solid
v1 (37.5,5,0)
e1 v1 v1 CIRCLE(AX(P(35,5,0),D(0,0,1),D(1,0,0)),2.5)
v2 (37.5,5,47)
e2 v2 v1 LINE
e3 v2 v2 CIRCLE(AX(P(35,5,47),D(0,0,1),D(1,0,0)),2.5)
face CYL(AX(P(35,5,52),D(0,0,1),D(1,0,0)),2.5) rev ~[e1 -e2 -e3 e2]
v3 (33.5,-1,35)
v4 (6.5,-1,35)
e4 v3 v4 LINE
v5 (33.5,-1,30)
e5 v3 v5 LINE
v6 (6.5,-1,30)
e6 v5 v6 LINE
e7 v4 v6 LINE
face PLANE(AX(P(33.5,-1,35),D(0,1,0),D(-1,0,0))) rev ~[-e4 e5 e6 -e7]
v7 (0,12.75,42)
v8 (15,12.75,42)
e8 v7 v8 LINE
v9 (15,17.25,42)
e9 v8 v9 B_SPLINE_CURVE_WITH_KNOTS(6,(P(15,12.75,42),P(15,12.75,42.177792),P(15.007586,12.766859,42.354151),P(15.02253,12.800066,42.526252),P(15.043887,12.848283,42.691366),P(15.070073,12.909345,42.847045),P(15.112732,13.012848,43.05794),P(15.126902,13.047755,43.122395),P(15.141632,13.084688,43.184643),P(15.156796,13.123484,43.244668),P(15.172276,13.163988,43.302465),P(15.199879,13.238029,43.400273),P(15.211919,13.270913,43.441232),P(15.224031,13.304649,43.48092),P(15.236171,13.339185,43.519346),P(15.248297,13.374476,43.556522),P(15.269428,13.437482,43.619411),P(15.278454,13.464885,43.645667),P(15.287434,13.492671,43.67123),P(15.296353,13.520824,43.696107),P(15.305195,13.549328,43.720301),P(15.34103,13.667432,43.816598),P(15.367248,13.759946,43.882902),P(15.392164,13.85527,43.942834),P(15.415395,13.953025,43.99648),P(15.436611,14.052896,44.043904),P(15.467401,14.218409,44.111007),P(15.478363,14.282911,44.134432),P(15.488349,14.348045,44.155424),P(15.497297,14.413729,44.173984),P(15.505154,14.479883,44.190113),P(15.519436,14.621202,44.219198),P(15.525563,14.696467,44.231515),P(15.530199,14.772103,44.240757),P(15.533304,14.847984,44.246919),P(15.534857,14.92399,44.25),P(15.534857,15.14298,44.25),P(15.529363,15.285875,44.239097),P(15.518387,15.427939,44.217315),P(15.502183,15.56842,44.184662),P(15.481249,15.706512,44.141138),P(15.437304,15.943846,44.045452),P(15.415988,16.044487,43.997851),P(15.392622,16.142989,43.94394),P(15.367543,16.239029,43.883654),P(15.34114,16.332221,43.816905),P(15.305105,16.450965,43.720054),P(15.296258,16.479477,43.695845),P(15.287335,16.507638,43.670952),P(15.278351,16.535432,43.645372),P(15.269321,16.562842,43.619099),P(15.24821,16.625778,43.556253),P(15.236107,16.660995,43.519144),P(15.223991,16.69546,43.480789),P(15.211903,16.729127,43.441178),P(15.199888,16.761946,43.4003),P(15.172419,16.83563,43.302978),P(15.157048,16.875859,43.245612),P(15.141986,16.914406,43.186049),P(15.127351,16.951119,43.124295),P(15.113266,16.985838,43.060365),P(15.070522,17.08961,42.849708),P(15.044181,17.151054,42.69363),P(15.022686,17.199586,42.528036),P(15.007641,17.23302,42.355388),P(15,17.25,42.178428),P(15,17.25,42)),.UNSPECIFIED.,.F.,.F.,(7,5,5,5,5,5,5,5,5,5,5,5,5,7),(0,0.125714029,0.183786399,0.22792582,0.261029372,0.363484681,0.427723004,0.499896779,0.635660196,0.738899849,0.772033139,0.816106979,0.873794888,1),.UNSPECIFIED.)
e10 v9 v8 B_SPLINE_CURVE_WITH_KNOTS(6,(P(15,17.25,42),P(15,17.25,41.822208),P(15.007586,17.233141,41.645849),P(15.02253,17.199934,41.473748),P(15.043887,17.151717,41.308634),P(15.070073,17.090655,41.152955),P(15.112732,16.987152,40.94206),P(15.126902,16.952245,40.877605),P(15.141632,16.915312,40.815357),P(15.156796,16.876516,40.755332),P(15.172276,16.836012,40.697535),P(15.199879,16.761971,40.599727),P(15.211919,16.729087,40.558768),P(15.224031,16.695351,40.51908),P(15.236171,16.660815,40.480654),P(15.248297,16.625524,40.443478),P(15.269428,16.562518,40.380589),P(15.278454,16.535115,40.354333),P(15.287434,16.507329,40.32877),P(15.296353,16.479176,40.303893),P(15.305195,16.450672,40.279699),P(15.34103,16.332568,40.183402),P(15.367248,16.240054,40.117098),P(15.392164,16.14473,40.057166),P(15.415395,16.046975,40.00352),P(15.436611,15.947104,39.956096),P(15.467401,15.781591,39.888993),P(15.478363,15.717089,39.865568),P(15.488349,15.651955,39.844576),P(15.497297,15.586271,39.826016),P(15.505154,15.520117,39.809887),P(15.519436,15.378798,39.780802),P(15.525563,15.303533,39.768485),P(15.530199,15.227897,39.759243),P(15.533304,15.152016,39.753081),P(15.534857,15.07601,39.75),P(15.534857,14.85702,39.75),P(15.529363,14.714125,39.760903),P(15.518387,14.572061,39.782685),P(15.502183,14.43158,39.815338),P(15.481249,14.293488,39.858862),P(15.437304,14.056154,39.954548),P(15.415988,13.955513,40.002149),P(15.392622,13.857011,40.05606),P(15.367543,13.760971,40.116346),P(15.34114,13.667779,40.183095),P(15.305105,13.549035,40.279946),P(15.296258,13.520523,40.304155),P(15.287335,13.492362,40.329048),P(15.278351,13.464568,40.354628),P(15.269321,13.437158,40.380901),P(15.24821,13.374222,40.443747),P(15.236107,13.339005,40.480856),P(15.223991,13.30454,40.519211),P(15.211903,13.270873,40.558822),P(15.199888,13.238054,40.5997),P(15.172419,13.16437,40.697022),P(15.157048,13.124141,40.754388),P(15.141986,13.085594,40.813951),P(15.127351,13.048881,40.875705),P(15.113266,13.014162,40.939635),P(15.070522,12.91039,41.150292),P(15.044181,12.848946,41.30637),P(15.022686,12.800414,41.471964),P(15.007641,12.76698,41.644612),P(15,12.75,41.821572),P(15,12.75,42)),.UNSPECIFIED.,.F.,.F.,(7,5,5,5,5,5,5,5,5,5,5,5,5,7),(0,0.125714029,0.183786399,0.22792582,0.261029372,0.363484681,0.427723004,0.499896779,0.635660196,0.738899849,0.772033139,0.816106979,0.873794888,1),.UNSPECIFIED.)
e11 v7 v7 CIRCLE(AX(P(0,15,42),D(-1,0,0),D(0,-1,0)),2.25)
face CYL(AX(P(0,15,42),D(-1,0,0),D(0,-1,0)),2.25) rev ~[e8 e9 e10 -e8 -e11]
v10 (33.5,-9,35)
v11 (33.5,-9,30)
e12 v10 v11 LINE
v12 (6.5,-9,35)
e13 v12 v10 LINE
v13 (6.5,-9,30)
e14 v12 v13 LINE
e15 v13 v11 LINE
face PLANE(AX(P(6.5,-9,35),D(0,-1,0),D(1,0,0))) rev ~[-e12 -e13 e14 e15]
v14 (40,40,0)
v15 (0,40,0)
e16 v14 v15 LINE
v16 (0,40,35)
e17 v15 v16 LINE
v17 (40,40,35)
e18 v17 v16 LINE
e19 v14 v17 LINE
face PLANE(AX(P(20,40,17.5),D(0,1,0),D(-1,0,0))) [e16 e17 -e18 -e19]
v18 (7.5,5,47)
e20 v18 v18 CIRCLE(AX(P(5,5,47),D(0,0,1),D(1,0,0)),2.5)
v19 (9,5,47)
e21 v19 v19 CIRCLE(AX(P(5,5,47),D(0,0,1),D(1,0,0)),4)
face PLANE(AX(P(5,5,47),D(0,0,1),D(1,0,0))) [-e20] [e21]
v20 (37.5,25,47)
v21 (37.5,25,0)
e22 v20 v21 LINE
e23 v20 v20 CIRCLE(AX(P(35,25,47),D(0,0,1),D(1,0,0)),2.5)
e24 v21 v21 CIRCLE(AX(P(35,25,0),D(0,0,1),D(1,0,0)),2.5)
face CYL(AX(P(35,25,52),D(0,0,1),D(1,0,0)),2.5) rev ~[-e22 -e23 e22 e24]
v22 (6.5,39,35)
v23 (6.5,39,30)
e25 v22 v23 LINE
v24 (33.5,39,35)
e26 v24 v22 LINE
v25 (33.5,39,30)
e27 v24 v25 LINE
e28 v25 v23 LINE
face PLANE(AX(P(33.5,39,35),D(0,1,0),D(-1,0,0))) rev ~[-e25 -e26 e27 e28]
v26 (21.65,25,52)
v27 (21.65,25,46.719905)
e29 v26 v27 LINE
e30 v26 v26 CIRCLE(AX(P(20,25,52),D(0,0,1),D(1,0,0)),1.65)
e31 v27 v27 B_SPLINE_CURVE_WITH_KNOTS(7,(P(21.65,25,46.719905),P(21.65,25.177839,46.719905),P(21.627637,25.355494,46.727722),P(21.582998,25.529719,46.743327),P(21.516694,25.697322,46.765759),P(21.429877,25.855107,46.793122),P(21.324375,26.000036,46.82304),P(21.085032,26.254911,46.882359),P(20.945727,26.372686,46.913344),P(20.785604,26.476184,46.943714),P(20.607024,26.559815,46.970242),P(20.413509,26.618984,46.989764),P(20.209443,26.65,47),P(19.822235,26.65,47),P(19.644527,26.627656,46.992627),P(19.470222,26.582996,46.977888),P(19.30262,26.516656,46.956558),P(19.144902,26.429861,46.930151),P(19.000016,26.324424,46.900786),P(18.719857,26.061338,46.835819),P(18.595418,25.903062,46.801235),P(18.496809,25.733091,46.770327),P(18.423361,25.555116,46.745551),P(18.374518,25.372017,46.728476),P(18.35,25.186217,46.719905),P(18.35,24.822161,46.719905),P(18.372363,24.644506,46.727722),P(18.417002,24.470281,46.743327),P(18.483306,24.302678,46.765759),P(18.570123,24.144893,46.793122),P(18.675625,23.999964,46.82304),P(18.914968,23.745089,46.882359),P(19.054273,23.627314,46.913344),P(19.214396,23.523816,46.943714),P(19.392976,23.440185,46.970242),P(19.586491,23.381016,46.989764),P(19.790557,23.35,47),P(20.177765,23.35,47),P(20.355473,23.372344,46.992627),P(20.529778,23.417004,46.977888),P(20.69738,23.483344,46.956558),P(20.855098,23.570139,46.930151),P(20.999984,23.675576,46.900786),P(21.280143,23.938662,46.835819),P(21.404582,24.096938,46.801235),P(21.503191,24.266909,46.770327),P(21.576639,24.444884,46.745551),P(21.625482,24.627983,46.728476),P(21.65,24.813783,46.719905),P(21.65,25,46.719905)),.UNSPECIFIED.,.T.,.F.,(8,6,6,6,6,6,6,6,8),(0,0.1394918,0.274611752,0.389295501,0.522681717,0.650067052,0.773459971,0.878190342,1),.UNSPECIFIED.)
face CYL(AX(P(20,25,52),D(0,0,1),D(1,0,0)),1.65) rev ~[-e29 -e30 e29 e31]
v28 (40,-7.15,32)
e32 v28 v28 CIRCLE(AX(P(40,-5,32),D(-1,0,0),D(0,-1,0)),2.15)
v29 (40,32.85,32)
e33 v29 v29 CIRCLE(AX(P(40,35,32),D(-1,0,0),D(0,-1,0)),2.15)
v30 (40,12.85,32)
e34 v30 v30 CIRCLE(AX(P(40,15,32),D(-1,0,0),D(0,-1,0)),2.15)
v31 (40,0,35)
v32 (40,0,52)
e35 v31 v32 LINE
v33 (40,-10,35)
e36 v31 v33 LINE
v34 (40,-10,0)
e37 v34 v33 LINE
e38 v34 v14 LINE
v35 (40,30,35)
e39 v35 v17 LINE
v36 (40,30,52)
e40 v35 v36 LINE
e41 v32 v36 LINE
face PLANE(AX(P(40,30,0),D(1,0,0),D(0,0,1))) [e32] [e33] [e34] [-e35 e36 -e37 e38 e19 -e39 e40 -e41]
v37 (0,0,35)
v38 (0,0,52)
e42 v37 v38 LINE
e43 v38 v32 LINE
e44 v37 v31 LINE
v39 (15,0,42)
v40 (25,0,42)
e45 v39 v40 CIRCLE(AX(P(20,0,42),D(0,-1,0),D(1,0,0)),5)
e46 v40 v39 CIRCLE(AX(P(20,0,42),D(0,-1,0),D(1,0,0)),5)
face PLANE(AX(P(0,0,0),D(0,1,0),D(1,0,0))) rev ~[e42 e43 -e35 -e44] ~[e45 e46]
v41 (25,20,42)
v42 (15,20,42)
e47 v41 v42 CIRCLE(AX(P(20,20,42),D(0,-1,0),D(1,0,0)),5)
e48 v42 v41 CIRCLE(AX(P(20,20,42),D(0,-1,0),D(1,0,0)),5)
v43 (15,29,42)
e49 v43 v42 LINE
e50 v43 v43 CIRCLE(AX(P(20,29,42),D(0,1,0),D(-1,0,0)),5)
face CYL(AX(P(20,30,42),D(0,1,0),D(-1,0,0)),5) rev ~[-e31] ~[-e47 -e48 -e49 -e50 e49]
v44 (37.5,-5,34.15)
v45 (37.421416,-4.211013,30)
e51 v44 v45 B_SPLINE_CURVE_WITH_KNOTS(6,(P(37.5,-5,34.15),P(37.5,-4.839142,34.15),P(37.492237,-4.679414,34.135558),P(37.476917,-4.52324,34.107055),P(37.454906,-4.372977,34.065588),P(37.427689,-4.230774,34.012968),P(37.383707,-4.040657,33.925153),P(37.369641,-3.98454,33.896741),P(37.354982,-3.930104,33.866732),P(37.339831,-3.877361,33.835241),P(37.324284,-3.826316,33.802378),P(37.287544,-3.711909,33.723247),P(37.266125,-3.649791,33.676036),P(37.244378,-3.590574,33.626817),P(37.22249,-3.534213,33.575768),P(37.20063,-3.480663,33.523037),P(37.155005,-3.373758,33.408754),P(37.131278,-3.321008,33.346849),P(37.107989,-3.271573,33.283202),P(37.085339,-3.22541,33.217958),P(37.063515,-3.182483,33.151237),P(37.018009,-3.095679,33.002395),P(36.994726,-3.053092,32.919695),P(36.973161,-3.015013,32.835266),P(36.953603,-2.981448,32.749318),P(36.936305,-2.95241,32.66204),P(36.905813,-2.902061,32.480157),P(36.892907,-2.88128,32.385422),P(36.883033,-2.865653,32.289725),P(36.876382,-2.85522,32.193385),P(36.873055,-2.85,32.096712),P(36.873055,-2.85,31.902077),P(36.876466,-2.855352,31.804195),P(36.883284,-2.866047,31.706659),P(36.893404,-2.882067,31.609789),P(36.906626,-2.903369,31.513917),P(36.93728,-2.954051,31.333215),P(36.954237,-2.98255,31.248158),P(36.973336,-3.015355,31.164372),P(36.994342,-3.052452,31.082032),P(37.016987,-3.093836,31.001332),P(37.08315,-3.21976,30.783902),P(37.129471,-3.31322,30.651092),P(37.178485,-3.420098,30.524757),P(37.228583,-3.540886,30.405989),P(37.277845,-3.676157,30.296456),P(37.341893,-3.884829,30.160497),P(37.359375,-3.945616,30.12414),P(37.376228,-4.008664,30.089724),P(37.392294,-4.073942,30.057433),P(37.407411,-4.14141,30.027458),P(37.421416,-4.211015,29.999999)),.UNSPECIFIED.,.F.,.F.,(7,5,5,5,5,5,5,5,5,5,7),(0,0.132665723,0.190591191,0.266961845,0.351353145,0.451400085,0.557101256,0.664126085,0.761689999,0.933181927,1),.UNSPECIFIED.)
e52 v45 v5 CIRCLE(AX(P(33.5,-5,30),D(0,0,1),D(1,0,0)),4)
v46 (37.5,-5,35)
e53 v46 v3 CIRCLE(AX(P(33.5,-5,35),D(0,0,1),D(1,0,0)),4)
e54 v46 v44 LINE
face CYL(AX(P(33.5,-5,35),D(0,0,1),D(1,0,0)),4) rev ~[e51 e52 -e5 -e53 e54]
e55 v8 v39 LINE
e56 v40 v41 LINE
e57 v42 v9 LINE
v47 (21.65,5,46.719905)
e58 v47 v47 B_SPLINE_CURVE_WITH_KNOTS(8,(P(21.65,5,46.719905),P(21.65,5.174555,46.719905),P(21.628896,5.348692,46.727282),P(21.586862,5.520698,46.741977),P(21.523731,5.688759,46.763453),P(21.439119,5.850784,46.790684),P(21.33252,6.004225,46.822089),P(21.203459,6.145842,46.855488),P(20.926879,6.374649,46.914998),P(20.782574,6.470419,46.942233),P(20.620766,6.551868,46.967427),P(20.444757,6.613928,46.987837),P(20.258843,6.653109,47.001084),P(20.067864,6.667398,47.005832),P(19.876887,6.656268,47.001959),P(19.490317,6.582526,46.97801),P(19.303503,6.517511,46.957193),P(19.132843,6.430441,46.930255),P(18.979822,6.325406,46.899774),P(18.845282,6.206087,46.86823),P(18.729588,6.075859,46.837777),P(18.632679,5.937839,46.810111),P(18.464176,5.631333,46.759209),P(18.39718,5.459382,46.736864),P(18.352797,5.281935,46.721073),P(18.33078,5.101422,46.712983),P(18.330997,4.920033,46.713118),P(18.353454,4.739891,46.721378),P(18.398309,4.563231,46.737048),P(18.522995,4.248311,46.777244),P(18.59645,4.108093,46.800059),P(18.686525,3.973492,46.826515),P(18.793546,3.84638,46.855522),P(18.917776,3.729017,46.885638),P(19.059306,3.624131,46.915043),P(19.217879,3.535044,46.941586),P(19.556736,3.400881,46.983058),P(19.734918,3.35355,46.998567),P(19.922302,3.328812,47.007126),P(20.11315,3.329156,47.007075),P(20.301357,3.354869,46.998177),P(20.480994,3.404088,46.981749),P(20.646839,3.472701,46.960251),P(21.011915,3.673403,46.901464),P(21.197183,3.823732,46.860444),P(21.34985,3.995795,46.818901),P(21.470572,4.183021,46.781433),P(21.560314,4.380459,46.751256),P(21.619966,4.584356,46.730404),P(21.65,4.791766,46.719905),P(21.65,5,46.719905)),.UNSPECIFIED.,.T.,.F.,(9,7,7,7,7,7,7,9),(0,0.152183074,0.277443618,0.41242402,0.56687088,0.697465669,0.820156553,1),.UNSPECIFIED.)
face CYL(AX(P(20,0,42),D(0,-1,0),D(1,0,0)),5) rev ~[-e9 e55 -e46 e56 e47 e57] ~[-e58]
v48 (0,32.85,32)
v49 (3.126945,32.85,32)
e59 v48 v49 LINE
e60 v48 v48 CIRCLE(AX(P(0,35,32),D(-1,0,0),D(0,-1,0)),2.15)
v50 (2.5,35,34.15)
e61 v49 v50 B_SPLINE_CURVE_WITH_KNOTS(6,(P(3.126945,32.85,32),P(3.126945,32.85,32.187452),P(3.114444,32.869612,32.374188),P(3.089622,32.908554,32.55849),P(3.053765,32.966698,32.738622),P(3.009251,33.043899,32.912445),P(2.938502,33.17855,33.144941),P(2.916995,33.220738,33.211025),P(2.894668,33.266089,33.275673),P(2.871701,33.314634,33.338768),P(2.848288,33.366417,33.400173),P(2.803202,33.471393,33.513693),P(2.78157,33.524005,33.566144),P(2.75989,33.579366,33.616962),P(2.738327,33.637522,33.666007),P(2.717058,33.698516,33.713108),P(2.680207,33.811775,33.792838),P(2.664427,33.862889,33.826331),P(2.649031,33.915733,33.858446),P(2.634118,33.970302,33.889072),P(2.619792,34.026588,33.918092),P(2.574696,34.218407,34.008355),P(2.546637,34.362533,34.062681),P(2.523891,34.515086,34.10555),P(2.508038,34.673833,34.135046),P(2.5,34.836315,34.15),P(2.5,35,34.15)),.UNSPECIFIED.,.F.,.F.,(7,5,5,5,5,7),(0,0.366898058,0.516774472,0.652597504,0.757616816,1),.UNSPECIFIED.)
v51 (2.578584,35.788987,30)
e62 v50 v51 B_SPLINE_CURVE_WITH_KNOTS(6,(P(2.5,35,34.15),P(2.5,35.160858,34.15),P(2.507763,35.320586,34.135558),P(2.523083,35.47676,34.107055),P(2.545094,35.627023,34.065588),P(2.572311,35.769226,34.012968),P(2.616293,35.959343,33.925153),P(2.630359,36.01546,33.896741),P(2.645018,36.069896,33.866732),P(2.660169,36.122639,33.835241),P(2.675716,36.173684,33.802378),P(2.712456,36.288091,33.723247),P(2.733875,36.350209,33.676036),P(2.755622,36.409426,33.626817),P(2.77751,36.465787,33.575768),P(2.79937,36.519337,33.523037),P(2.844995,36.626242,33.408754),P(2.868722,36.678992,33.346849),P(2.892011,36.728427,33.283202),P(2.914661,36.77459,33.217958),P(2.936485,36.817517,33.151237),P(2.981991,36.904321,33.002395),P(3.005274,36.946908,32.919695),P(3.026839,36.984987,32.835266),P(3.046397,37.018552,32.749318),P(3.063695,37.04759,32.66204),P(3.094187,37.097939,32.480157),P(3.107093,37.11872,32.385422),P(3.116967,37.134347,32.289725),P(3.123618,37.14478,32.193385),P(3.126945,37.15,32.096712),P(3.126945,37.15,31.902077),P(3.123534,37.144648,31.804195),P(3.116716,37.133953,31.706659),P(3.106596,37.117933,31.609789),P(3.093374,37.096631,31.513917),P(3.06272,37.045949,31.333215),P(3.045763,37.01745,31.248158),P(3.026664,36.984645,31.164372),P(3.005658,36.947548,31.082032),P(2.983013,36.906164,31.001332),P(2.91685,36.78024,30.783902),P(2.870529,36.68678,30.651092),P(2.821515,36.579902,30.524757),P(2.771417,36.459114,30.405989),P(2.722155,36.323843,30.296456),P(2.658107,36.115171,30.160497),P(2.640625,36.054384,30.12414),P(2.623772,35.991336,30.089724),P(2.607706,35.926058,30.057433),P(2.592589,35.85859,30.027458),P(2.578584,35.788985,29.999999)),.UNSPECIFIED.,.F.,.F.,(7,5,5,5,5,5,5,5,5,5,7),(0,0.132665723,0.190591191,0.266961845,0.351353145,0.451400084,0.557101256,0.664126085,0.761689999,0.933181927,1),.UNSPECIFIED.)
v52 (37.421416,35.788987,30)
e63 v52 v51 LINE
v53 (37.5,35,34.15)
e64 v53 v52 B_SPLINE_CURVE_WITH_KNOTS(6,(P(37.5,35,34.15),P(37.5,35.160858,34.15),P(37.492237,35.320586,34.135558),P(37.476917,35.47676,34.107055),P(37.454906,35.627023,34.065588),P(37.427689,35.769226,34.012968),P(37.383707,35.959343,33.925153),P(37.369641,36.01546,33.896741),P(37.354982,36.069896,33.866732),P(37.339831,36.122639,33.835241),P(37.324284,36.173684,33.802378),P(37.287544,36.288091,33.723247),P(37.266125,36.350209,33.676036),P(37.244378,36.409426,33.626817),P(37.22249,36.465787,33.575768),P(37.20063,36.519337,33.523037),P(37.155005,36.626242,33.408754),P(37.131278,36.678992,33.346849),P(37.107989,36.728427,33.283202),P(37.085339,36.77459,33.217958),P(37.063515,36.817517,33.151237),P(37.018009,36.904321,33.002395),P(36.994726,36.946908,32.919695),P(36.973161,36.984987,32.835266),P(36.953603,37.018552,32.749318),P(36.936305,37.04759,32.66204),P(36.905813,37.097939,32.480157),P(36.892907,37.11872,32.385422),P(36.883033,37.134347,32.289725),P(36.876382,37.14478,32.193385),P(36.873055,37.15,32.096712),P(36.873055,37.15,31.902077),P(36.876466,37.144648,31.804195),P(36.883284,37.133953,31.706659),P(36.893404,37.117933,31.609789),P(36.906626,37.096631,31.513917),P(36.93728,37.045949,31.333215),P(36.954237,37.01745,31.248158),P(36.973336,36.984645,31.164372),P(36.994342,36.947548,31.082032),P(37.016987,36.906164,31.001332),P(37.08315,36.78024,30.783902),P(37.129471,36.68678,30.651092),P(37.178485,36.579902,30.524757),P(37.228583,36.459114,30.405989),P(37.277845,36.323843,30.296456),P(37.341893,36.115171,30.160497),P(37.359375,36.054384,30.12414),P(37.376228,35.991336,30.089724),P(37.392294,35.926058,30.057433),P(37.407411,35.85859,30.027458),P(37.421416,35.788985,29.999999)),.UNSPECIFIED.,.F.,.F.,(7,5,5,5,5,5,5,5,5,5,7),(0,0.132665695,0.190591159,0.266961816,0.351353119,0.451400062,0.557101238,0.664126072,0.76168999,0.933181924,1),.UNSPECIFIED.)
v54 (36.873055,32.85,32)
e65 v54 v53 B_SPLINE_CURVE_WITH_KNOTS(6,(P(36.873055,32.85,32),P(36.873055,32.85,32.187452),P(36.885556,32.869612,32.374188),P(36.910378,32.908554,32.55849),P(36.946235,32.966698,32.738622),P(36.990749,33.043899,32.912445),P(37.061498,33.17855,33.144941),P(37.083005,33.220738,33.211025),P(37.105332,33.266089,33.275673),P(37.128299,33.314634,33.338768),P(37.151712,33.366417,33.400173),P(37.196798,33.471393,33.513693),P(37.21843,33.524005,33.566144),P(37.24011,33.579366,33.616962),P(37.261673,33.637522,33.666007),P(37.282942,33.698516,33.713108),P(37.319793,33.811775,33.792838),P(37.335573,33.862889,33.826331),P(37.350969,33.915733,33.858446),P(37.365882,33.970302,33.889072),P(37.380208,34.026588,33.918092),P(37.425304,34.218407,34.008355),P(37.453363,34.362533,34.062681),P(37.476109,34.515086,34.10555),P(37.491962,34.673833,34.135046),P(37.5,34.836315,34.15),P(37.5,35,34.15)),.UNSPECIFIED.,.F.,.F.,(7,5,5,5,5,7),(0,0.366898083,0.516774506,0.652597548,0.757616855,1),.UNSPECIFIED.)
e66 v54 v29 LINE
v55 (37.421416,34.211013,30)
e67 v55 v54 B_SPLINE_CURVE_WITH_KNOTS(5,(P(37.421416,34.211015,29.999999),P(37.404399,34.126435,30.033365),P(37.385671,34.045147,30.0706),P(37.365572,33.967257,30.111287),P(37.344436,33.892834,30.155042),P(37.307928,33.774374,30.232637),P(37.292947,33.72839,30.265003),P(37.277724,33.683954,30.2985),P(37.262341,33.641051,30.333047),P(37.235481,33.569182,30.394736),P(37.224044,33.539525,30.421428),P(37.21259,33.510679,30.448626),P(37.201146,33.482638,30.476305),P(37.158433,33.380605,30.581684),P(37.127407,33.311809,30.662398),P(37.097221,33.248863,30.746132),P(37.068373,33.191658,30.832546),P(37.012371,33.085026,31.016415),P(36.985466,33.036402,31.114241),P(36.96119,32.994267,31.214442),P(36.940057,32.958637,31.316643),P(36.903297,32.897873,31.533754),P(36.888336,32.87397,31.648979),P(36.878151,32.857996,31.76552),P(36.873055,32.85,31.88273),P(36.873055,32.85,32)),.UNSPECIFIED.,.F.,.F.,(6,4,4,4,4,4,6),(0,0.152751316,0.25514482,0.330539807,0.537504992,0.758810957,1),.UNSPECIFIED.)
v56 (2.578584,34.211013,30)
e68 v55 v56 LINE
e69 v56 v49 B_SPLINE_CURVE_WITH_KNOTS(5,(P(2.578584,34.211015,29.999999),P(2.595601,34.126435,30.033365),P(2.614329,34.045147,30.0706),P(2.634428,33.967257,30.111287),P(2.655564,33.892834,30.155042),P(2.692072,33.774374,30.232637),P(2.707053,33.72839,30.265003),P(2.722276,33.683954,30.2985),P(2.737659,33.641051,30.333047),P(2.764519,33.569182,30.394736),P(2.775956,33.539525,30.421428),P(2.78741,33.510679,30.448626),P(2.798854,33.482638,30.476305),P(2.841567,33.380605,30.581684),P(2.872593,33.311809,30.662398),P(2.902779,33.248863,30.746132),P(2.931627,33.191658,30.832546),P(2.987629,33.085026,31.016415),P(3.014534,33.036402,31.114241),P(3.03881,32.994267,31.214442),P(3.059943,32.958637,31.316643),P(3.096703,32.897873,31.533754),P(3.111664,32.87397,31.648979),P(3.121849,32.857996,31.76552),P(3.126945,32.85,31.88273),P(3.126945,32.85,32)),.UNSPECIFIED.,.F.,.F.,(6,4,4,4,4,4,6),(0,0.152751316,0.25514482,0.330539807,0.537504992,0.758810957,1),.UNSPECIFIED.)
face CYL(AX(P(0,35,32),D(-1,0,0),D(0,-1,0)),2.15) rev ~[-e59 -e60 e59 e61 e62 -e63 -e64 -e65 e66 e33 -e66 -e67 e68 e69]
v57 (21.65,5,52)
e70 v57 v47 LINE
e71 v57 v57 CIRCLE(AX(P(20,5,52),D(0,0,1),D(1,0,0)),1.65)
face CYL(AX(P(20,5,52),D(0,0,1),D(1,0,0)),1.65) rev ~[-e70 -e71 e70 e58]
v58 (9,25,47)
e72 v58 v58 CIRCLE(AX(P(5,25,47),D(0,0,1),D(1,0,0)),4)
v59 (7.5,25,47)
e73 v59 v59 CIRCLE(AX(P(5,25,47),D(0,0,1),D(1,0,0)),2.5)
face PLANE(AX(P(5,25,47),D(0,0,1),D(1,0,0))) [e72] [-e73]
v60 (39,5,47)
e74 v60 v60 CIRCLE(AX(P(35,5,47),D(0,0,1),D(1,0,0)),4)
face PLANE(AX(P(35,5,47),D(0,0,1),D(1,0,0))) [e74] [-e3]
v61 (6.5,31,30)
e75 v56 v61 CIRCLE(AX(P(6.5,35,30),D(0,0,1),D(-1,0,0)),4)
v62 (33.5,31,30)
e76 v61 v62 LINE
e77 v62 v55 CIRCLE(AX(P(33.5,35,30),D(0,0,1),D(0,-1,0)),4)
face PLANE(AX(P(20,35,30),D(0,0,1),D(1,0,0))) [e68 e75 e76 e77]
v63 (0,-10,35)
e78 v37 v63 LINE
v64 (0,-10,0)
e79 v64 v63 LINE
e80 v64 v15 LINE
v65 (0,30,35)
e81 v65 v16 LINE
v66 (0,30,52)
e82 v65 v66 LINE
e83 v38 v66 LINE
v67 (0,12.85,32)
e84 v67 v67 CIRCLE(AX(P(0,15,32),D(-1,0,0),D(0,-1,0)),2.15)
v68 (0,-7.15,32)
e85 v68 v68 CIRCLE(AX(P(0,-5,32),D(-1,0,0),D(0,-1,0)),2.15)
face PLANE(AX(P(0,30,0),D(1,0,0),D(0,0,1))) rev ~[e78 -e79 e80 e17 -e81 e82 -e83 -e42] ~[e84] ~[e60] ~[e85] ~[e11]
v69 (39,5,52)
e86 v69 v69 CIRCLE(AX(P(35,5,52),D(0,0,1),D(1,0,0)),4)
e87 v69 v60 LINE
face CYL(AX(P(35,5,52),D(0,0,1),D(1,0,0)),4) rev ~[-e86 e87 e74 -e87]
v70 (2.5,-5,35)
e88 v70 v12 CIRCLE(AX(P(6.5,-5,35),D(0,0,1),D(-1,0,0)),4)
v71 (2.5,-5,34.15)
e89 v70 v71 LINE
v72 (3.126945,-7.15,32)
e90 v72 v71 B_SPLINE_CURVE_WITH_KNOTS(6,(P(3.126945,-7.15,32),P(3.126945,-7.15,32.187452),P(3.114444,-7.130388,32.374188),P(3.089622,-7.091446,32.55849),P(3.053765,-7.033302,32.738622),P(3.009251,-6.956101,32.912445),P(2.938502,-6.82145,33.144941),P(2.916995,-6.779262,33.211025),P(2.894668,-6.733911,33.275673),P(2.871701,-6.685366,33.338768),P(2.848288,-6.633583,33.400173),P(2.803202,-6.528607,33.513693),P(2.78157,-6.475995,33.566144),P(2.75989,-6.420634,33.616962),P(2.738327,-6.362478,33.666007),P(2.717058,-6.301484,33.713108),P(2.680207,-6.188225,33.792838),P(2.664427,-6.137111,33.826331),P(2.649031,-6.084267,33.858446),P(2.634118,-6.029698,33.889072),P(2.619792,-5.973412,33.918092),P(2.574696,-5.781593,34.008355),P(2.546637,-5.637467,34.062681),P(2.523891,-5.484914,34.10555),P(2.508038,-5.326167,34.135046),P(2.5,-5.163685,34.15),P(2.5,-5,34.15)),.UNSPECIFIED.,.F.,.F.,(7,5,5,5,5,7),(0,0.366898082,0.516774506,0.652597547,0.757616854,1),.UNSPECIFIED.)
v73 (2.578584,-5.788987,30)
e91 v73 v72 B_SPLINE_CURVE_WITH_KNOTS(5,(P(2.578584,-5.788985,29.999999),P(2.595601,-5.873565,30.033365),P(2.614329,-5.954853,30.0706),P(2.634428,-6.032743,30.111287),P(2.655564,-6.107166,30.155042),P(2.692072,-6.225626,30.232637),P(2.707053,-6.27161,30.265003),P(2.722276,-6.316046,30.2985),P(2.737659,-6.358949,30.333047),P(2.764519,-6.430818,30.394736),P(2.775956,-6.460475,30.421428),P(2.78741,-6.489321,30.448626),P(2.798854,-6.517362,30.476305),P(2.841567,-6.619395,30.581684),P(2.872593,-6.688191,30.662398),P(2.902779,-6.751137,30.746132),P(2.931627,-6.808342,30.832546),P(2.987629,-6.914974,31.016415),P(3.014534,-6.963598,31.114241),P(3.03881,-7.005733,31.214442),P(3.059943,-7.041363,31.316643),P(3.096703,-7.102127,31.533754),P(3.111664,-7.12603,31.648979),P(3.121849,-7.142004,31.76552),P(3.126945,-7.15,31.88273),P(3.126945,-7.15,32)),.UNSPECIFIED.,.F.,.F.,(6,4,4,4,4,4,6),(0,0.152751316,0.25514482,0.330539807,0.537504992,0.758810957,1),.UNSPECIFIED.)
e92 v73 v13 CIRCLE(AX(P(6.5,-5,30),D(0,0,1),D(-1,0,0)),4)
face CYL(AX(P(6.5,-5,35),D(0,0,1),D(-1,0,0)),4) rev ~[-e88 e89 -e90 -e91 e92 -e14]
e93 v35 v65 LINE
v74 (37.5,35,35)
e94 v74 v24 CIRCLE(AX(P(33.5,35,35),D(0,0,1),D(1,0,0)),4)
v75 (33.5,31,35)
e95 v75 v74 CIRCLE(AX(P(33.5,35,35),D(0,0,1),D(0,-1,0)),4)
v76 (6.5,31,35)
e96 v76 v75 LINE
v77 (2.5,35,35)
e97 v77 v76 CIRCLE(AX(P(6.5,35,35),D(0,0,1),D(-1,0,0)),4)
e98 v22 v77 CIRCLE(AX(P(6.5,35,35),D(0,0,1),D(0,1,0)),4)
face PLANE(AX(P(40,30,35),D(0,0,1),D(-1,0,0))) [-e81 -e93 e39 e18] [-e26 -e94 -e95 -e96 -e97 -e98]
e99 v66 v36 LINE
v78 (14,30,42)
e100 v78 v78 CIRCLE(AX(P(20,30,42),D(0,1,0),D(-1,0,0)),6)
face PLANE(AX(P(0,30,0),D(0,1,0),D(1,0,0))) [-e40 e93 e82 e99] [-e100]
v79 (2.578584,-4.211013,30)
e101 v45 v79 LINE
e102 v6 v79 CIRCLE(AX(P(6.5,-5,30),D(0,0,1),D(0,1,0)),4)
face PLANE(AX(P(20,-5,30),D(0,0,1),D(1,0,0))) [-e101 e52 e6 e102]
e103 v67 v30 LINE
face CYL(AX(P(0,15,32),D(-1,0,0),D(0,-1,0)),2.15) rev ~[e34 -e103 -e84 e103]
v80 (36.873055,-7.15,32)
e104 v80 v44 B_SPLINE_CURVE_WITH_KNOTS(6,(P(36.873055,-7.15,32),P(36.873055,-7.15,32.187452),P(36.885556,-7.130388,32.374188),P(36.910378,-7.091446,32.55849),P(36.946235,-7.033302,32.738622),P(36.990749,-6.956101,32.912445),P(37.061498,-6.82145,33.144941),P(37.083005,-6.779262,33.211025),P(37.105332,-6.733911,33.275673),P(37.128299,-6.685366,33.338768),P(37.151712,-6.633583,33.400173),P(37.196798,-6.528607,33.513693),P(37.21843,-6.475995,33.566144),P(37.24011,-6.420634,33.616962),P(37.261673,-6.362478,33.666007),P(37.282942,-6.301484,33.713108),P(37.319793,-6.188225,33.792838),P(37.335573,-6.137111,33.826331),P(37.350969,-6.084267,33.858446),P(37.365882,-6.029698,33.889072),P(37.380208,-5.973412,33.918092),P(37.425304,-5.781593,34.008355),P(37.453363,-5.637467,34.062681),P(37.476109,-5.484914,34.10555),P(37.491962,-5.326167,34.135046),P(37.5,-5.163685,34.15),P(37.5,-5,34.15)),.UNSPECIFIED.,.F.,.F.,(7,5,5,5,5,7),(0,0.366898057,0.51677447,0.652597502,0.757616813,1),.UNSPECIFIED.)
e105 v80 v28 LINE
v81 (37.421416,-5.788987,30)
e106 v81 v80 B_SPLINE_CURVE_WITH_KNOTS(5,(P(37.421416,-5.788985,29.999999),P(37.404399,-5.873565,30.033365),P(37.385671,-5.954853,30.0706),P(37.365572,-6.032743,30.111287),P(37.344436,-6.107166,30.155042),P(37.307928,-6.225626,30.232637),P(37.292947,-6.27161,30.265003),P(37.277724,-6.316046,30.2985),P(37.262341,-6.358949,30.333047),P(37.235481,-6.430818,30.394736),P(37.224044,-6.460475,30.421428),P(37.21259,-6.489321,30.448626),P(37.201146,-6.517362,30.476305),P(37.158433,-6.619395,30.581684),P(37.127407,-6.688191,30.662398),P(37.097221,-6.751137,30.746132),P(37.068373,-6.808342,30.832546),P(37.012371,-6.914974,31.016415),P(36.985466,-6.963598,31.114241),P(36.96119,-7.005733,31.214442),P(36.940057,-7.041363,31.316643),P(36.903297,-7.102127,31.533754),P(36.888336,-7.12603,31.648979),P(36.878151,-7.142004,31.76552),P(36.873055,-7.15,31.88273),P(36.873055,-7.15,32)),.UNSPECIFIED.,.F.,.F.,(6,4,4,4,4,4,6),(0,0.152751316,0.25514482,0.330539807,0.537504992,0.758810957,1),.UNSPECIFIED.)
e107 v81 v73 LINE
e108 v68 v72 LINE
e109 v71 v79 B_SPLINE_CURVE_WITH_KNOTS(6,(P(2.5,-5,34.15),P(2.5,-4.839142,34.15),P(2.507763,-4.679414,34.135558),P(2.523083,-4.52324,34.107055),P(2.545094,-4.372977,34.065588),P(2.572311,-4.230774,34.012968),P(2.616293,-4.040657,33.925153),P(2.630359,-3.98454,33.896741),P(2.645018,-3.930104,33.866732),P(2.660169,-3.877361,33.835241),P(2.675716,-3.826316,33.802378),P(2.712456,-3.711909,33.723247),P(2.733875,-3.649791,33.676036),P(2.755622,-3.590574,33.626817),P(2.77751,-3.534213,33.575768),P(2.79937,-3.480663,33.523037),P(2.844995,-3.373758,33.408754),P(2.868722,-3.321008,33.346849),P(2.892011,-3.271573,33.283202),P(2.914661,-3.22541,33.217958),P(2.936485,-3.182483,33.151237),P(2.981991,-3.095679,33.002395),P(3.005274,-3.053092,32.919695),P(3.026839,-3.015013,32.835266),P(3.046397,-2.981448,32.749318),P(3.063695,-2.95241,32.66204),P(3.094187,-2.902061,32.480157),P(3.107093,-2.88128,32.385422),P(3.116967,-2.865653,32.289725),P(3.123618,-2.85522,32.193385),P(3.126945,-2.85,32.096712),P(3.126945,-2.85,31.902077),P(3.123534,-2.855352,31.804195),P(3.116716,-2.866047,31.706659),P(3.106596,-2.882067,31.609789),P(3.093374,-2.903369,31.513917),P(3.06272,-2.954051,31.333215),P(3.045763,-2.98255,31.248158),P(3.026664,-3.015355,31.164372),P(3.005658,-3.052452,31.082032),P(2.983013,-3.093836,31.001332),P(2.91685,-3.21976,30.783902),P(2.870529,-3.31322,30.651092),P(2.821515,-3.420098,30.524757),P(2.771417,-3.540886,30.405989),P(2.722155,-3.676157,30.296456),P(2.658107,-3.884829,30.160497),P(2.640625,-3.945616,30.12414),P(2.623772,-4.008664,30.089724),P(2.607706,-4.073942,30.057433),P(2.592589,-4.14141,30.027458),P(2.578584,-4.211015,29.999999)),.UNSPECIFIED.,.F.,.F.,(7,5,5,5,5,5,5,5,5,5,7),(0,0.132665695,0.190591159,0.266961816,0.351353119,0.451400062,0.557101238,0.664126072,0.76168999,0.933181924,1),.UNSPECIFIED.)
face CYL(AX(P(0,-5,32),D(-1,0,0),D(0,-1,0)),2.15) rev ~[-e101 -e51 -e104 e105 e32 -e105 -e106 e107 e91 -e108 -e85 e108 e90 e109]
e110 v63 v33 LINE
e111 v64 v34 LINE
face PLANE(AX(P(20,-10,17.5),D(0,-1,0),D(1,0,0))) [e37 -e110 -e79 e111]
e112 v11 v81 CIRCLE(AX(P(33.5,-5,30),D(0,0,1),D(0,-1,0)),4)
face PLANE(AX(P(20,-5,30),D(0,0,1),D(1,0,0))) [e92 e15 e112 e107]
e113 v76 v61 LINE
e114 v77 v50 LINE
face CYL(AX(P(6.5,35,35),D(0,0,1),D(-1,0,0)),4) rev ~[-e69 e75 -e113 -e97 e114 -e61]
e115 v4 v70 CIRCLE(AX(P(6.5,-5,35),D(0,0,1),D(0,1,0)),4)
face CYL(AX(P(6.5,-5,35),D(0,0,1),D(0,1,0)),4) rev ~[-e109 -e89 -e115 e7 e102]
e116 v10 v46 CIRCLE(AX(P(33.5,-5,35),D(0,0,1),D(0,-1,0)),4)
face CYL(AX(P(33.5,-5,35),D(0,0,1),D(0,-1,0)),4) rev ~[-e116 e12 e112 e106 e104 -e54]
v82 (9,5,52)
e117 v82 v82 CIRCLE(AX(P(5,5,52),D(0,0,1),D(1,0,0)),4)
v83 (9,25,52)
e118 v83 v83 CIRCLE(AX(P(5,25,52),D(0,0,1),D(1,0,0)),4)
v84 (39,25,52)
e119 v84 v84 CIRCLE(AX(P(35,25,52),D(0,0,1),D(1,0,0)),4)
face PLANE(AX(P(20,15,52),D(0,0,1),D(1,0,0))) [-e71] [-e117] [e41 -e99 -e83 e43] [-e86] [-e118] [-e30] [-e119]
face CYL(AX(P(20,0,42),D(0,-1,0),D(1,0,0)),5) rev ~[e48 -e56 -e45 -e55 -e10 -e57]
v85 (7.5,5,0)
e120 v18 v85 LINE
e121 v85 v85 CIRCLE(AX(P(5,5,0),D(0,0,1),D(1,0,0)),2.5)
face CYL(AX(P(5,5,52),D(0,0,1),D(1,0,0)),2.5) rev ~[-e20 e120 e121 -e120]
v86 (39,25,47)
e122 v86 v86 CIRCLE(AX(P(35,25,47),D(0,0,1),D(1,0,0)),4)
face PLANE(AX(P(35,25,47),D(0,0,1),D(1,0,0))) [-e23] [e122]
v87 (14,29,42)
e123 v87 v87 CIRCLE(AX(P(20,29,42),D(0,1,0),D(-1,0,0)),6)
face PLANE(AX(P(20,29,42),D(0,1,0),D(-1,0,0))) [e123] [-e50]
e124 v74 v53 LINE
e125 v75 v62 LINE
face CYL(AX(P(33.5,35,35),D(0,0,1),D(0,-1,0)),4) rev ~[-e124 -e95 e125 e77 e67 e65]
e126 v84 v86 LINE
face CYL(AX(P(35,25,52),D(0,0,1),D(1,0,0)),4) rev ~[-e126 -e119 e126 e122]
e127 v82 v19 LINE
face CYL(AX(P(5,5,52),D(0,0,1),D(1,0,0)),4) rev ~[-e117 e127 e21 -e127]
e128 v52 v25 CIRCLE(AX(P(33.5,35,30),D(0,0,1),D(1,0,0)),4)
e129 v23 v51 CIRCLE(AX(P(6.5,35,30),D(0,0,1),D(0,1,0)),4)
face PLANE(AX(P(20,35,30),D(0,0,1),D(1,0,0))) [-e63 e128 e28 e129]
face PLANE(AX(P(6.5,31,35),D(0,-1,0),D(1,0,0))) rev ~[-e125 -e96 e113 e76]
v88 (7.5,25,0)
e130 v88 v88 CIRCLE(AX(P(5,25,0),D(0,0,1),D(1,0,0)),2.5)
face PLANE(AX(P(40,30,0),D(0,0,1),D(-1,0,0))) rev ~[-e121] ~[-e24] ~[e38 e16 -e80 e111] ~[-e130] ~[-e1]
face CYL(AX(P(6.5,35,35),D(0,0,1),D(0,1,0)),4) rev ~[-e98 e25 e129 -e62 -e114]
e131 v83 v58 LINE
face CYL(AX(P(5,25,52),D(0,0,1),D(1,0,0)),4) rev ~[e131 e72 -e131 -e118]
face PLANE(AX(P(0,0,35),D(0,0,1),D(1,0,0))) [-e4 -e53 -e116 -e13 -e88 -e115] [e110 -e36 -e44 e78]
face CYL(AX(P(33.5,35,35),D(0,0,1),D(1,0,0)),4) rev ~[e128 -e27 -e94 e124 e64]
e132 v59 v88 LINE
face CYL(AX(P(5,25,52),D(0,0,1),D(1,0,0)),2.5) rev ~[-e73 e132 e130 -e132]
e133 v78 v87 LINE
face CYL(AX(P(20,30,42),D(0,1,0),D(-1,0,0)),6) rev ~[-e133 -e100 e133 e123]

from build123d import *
from build123d import SkipClean  # not in build123d's __all__

# Parameters (mm, degrees)
F0_W      = 40
F0_H      = 30
F1_DEPTH  = 52
F2_R      = 5
F3_DEPTH  = 20
F4_R      = 1.65
F5_DEPTH  = 10
F6_R      = 2.5
F7_DEPTH  = 52.001
F8_R      = 4
F9_DEPTH  = 5
F10_W     = 40
F10_H     = 35
F11_DEPTH = 10
F12_W     = 40
F12_H     = 35
F13_DEPTH = 10
F15_DEPTH = 5
F16_R     = 2.15
F17_DEPTH = 40.001
F18_R     = 5
F19_DEPTH = 40.001
F20_R     = 6
F21_DEPTH = 1
F22_R     = 2.25
F23_DEPTH = 15.5358573251


with BuildPart() as f1:
    # F0 (on Top) → F1 (new body)
    with BuildSketch(Plane.XY):
        with Locations((20, 15)):
            Rectangle(F0_W, F0_H)
    extrude(amount=F1_DEPTH)

    # F2 (on face) → F3 (cut)
    with BuildSketch(Plane.XZ):
        with Locations((20, 42)):
            Circle(F2_R)
    extrude(amount=-F3_DEPTH, mode=Mode.SUBTRACT)

    # F4 (on face) → F5 (cut)
    with BuildSketch(Plane.XY.offset(52)):
        with Locations((20, 5)):
            Circle(F4_R)
        with Locations((20, 25)):
            Circle(F4_R)
    extrude(amount=-F5_DEPTH, mode=Mode.SUBTRACT)

    # F6 (on face) → F7 (cut, through all)
    with BuildSketch(Plane.XY.offset(52)):
        with Locations((5, 5)):
            Circle(F6_R)
        with Locations((5, 25)):
            Circle(F6_R)
        with Locations((35, 5)):
            Circle(F6_R)
        with Locations((35, 25)):
            Circle(F6_R)
    extrude(amount=-F7_DEPTH, mode=Mode.SUBTRACT)

    # F8 (on face) → F9 (cut)
    with BuildSketch(Plane.XY.offset(52)):
        with Locations((5, 25)):
            Circle(F8_R)
        with Locations((5, 5)):
            Circle(F8_R)
        with Locations((35, 25)):
            Circle(F8_R)
        with Locations((35, 5)):
            Circle(F8_R)
    extrude(amount=-F9_DEPTH, mode=Mode.SUBTRACT)

    # F10 (on face) → F11 (join)
    with BuildSketch(Plane.XZ):
        with Locations((20, 17.5)):
            Rectangle(F10_W, F10_H)
    extrude(amount=F11_DEPTH)

    # F12 (on face) → F13 (join)
    with BuildSketch(Plane(origin=(0, 30, 0), x_dir=(-1, 0, 0), z_dir=(0, 1, 0))):
        with Locations((-20, 17.5)):
            Rectangle(F12_W, F12_H)
    extrude(amount=F13_DEPTH)

    # F14 (on face) → F15 (cut)
    with BuildSketch(Plane.XY.offset(35)):
        with BuildLine():
            Line((6.5, 31), (33.5, 31))
            ThreePointArc((33.5, 31), (36.3284271247, 32.1715728753), (37.5, 35))
            ThreePointArc((37.5, 35), (36.3284271247, 37.8284271247), (33.5, 39))
            Line((33.5, 39), (6.5, 39))
            ThreePointArc((6.5, 39), (3.6715728753, 37.8284271247), (2.5, 35))
            ThreePointArc((2.5, 35), (3.6715728753, 32.1715728753), (6.5, 31))
        make_face()
        with BuildLine():
            Line((6.5, -9), (33.5, -9))
            ThreePointArc((33.5, -9), (36.3284271247, -7.8284271247), (37.5, -5))
            ThreePointArc((37.5, -5), (36.3284271247, -2.1715728753), (33.5, -1))
            Line((33.5, -1), (6.5, -1))
            ThreePointArc((6.5, -1), (3.6715728753, -2.1715728753), (2.5, -5))
            ThreePointArc((2.5, -5), (3.6715728753, -7.8284271247), (6.5, -9))
        make_face()
    extrude(amount=-F15_DEPTH, mode=Mode.SUBTRACT)

    # F16 (on face) → F17 (cut, through all)
    with BuildSketch(Plane(origin=(0, 0, 0), x_dir=(0, -1, 0), z_dir=(-1, 0, 0))):
        with Locations((-15, 32)):
            Circle(F16_R)
        with Locations((-35, 32)):
            Circle(F16_R)
        with Locations((5, 32)):
            Circle(F16_R)
    extrude(amount=-F17_DEPTH, mode=Mode.SUBTRACT)

    # F18 (on face) → F19 (cut, through all)
    with BuildSketch(Plane(origin=(0, 30, 0), x_dir=(-1, 0, 0), z_dir=(0, 1, 0))):
        with Locations((-20, 42)):
            Circle(F18_R)
    with SkipClean():  # cleaning this boolean's faces spoils the solid; the shape is the same uncleaned
        extrude(amount=-F19_DEPTH, mode=Mode.SUBTRACT)

    # F20 (on face) → F21 (cut)
    with BuildSketch(Plane(origin=(0, 30, 0), x_dir=(-1, 0, 0), z_dir=(0, 1, 0))):
        with Locations((-20, 42)):
            Circle(F20_R)
    with SkipClean():  # cleaning this boolean's faces spoils the solid; the shape is the same uncleaned
        extrude(amount=-F21_DEPTH, mode=Mode.SUBTRACT)

    # F22 (on face) → F23 (cut, through all)
    with BuildSketch(Plane(origin=(0, 0, 0), x_dir=(0, -1, 0), z_dir=(-1, 0, 0))):
        with Locations((-15, 42)):
            Circle(F22_R)
    with SkipClean():  # cleaning this boolean's faces spoils the solid; the shape is the same uncleaned
        extrude(amount=-F23_DEPTH, mode=Mode.SUBTRACT)


solid = f1.part
